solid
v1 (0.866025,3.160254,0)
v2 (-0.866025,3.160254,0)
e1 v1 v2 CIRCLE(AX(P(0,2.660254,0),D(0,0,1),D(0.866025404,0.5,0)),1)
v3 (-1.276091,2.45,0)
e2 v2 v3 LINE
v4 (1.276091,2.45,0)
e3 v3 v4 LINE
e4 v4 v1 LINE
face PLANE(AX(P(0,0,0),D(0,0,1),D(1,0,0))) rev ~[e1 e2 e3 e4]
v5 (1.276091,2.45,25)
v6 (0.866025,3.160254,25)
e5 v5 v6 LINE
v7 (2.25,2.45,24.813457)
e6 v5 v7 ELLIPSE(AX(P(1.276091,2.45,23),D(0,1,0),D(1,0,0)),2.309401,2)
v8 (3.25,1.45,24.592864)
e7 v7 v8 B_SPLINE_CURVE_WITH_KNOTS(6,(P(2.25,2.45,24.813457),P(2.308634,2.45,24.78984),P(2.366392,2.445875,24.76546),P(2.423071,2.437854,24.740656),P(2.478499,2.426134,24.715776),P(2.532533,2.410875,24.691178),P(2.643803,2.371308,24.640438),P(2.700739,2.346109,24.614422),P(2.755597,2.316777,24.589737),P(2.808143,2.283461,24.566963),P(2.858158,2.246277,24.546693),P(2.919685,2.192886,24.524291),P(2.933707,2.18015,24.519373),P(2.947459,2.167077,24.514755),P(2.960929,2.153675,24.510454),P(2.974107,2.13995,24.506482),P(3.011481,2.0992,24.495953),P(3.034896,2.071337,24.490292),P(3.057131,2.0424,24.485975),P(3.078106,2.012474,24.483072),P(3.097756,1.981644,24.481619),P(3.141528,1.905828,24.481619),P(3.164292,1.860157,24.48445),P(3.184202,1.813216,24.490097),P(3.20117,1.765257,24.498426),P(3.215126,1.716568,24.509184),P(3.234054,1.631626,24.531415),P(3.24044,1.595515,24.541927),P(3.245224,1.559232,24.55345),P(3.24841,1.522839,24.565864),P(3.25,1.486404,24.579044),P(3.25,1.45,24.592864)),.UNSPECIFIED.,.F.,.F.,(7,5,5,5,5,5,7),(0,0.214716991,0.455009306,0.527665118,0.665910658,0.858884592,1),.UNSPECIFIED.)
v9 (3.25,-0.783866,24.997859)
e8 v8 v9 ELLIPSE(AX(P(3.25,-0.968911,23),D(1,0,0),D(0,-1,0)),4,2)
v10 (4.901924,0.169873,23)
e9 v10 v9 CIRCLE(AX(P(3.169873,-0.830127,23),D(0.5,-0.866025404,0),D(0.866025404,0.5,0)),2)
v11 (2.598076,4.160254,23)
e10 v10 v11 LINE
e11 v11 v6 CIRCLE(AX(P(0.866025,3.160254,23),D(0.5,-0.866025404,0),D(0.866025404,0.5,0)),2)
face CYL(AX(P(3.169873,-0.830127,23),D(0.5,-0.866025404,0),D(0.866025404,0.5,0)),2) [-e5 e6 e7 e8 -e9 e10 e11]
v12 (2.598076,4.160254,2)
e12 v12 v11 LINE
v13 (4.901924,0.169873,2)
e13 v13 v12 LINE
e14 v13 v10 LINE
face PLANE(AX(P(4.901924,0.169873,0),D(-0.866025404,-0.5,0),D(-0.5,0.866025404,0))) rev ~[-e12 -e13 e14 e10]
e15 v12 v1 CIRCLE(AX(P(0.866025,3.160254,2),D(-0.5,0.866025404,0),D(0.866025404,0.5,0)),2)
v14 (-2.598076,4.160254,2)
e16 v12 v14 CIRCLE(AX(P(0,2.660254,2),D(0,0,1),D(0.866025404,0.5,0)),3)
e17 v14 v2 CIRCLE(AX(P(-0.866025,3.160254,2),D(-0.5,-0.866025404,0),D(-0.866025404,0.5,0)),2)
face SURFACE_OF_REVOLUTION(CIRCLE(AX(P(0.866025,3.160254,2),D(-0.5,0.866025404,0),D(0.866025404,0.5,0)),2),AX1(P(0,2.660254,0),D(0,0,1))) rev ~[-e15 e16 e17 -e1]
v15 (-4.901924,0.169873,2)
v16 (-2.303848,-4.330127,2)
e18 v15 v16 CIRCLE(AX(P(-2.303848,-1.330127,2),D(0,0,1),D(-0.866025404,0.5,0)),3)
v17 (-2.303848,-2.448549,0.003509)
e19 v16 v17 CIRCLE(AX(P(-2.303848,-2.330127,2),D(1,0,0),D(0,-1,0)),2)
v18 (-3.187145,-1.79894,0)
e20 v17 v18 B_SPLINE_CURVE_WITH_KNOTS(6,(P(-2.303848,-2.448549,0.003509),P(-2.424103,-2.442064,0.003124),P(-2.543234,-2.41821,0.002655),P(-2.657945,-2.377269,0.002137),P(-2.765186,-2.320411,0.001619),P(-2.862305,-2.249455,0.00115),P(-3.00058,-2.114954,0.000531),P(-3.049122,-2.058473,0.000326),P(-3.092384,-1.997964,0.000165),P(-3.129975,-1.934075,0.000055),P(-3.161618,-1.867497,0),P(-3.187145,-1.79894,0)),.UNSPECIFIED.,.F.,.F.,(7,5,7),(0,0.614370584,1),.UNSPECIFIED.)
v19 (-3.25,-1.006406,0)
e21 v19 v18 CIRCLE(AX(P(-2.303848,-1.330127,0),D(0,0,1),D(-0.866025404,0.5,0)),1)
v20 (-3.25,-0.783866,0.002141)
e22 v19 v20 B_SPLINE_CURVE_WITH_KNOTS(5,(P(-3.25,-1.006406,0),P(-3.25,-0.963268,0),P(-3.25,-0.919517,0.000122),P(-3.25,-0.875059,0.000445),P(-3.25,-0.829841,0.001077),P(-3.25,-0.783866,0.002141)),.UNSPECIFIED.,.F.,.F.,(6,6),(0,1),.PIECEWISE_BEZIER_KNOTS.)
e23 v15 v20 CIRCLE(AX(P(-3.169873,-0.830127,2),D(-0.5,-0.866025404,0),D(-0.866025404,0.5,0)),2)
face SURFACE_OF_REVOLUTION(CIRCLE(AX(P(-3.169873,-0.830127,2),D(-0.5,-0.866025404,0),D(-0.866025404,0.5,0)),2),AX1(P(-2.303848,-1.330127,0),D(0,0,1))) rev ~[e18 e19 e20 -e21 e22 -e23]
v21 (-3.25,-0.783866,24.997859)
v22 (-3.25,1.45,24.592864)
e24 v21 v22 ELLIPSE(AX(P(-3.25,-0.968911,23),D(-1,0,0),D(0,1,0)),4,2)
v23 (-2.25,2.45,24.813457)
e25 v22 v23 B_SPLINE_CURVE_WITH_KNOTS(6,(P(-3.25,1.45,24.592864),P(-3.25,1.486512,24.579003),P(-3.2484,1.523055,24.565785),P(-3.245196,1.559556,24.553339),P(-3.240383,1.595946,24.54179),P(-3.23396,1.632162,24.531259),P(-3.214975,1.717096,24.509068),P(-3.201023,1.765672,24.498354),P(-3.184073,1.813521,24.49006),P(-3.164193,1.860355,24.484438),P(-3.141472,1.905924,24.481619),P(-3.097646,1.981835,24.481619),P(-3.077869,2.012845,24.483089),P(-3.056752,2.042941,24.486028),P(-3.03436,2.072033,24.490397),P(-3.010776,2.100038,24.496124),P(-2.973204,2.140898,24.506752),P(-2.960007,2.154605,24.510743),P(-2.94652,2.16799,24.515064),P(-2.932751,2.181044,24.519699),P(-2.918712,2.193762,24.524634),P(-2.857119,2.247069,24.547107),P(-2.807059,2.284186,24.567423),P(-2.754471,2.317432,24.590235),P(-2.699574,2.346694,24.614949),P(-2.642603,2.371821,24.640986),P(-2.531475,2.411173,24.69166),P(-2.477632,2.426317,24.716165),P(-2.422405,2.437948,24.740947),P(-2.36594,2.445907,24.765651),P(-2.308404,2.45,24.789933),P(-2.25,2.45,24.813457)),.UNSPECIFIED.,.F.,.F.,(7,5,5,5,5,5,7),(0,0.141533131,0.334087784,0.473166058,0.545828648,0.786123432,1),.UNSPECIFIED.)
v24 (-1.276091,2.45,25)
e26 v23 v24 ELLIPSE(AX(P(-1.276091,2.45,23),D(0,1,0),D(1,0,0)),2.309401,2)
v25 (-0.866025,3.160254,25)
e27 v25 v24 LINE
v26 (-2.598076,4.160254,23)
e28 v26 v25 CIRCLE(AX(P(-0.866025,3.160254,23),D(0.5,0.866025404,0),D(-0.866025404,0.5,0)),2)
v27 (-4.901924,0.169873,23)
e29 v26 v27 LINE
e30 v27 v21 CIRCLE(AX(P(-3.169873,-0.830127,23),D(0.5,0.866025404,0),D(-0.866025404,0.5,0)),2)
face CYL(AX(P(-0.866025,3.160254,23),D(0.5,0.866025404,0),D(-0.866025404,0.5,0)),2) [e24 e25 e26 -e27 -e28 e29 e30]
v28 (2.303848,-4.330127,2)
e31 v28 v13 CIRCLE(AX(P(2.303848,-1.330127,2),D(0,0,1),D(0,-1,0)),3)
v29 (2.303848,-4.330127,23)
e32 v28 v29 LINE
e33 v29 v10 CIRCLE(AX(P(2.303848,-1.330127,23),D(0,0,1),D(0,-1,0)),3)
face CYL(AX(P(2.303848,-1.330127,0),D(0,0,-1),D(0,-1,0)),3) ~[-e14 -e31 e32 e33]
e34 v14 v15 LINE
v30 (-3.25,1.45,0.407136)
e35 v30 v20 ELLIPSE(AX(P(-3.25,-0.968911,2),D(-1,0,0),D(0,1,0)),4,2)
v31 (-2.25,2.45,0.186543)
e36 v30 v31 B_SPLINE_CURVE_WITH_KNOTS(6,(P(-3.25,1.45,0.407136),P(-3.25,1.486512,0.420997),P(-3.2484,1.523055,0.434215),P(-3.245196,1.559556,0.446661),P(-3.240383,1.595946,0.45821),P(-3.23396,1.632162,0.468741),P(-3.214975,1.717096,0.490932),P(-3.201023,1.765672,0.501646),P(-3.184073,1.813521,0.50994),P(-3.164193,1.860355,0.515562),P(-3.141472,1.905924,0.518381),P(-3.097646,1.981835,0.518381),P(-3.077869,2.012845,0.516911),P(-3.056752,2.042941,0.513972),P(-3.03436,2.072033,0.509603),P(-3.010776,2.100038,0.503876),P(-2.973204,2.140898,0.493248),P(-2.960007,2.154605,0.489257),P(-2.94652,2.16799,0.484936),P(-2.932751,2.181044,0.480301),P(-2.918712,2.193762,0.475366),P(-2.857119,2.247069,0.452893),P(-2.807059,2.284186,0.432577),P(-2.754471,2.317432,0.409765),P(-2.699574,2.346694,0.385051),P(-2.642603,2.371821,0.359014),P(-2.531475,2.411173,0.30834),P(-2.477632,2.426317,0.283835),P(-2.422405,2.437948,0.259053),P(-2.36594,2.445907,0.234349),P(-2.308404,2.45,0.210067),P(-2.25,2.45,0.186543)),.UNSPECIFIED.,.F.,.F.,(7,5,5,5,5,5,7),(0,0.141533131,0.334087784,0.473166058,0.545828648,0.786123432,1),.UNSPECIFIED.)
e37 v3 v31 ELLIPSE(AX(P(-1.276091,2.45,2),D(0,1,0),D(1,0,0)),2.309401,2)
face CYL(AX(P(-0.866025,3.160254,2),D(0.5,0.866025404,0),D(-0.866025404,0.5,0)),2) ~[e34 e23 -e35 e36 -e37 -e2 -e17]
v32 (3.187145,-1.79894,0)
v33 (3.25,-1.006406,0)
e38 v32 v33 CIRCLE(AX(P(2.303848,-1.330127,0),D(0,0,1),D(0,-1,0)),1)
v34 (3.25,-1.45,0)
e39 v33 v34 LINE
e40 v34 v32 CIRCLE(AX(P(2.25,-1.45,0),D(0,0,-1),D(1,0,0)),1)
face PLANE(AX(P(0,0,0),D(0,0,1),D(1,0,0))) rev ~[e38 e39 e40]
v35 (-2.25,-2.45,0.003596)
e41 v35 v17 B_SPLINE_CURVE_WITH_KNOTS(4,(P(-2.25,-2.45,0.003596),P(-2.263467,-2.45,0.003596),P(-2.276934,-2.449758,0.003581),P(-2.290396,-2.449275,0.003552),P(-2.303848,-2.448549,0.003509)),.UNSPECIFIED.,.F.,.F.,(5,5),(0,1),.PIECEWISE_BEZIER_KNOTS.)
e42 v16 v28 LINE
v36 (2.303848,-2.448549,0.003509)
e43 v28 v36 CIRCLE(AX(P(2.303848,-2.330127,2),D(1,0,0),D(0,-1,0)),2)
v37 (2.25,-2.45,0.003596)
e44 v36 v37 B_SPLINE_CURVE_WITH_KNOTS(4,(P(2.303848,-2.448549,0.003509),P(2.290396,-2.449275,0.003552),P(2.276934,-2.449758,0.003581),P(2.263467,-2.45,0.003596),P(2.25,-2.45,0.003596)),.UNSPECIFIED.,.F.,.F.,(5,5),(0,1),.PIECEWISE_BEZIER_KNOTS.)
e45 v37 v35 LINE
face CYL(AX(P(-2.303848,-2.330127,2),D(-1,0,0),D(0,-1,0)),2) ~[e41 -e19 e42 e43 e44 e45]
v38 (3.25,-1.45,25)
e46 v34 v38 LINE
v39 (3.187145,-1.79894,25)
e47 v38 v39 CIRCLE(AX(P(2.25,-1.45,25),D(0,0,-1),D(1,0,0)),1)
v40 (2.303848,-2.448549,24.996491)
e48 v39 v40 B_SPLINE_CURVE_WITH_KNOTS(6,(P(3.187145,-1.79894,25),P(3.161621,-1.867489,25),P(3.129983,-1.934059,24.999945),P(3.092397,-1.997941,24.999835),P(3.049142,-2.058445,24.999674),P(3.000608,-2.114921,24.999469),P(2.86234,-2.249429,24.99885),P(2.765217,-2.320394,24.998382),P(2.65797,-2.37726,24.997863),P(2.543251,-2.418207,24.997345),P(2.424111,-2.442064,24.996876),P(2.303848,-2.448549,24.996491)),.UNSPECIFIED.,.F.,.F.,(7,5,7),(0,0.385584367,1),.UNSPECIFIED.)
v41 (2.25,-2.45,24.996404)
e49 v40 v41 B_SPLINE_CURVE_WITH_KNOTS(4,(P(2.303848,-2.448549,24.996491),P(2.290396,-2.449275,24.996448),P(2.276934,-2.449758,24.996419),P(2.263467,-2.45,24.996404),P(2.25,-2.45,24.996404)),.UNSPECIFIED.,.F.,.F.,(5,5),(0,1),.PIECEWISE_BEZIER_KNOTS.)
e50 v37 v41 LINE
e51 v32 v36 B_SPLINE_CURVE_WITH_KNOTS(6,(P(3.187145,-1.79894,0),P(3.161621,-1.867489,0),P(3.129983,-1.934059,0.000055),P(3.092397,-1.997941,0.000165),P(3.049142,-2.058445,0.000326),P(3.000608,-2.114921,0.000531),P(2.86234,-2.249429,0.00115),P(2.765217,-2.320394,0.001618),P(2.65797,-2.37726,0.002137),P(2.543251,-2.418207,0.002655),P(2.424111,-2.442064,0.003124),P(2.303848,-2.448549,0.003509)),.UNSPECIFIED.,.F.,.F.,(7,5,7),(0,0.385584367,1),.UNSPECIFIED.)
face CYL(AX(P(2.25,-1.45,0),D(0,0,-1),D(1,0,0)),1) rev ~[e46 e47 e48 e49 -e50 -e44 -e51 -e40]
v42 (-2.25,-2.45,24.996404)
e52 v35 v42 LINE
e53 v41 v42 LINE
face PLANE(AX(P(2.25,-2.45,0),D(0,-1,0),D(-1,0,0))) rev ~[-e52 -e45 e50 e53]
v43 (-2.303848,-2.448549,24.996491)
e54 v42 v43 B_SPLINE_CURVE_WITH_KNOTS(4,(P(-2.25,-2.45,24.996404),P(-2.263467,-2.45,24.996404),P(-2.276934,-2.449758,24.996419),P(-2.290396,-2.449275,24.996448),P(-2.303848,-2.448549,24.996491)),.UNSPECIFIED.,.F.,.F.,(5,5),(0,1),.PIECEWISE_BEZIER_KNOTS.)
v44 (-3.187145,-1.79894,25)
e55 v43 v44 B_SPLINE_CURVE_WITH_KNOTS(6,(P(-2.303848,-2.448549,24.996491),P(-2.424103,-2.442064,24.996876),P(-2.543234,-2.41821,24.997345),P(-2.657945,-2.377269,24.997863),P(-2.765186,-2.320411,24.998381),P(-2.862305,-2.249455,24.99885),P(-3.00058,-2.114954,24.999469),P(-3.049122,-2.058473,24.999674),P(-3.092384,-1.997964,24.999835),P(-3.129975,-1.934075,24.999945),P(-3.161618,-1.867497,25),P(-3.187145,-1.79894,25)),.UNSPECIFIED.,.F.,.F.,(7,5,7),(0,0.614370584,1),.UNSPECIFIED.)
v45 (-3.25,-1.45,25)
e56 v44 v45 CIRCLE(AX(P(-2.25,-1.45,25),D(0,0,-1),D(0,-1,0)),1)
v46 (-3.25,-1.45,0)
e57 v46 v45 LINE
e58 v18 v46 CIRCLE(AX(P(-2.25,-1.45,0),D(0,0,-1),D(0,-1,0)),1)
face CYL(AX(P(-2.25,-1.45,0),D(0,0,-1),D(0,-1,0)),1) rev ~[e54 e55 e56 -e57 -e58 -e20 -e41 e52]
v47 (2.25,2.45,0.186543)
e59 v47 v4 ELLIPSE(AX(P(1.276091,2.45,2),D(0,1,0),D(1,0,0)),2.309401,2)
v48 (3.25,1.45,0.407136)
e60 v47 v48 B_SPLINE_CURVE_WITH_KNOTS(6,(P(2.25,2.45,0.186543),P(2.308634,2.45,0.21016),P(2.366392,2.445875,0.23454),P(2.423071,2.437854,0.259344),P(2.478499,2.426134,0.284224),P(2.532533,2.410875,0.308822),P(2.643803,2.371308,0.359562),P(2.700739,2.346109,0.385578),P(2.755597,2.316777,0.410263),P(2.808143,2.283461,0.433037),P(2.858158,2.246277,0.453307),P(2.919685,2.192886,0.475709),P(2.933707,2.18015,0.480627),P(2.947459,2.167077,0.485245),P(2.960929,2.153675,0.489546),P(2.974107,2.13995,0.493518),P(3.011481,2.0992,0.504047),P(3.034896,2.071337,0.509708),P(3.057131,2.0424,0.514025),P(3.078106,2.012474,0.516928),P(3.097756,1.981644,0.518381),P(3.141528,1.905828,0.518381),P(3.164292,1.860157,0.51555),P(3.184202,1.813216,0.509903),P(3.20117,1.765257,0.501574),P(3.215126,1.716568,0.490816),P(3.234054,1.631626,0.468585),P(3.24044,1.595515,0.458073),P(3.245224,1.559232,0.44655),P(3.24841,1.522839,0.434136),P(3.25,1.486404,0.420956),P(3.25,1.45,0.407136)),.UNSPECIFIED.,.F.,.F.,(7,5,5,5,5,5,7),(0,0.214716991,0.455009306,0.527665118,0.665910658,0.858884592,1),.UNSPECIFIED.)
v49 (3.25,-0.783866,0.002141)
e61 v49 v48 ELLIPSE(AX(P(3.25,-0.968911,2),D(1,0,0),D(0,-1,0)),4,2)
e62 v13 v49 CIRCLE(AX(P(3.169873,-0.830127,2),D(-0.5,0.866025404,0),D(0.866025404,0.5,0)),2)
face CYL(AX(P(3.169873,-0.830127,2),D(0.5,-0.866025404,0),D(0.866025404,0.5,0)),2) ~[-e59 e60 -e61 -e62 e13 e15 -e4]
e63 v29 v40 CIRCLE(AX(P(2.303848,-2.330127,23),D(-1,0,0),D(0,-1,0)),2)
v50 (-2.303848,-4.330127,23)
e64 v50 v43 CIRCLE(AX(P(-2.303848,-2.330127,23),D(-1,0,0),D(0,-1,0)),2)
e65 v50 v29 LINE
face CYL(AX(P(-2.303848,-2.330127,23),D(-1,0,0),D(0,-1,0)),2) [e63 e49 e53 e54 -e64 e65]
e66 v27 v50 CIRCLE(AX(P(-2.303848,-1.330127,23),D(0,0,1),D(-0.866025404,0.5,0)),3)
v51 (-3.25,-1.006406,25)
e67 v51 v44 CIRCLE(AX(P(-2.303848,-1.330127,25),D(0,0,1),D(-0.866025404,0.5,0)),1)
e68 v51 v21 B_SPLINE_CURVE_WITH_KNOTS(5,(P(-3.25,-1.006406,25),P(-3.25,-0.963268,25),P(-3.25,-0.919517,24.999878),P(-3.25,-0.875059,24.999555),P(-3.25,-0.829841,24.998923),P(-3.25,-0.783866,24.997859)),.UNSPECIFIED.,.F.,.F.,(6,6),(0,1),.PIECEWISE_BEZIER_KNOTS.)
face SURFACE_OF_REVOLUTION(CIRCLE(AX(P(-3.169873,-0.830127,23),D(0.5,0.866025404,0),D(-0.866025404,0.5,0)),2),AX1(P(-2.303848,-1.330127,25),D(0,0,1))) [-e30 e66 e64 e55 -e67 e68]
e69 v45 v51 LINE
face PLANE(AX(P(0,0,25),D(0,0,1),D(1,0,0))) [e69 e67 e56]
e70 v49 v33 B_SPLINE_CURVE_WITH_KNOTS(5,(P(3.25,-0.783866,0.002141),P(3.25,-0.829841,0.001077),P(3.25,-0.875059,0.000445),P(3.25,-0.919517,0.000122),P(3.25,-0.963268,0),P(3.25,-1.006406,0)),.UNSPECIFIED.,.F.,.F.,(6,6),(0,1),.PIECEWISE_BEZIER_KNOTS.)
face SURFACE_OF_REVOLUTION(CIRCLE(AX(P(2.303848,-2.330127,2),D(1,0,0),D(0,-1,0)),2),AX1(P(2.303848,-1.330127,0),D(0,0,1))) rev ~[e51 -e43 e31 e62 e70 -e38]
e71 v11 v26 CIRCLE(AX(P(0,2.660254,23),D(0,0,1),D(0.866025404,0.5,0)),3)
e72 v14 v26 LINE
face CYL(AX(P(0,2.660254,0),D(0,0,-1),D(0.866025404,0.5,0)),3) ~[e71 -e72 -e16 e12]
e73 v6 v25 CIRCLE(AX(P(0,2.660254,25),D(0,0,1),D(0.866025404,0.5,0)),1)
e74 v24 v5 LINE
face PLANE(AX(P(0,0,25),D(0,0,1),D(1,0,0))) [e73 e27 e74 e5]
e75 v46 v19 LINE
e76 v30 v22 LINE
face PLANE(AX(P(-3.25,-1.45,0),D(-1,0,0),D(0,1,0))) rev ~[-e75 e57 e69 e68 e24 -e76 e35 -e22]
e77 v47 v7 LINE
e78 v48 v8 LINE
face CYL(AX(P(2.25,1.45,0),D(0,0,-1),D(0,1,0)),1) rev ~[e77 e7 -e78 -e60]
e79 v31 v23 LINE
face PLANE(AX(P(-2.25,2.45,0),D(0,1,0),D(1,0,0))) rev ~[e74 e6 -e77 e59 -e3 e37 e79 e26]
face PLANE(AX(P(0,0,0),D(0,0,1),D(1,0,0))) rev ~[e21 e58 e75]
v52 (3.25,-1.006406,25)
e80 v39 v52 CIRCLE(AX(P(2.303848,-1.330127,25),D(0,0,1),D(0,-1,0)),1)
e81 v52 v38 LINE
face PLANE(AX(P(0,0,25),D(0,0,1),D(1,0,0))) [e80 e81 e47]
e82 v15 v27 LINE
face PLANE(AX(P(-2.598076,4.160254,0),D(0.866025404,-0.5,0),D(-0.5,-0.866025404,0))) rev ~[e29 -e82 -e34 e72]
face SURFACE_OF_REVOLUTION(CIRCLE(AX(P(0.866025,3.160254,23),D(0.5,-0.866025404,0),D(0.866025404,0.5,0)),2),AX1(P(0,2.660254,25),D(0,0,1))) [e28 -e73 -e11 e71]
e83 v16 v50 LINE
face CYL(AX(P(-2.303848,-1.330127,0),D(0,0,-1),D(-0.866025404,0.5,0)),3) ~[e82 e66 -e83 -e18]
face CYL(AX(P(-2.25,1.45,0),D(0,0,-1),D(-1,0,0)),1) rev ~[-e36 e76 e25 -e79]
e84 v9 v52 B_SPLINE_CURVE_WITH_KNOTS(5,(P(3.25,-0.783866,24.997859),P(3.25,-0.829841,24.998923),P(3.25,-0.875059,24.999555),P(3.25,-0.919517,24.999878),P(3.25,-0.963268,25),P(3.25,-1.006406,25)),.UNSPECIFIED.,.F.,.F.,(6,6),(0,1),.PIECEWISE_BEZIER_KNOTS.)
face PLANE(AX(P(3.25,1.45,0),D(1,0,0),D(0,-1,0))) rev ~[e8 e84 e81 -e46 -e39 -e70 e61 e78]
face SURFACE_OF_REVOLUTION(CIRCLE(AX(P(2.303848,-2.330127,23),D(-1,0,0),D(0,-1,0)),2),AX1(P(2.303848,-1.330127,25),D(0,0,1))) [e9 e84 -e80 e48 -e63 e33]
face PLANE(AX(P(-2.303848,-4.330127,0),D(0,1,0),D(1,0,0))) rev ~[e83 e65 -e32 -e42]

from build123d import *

# Parameters (mm, degrees)
F1_DEPTH     = 25
F2_T1_DEPTH  = 4.6076951546
F2_T3_DEPTH  = 4.6076951546
F2_T5_DEPTH  = 4.6076951546
F2_T8_ANGLE  = 120
F2_T10_ANGLE = 120
F2_T12_ANGLE = 120
F2_T14_ANGLE = 120
F2_T16_ANGLE = 120
F2_T18_ANGLE = 120


# Not quite as in the source:
# - a fillet or chamfer that OpenCascade refuses, or shapes differently, is made with other operations: its cross-section is extruded or revolved along the edge and cut away or added


with BuildPart() as f1:
    # F0 (on Top) → F1 (new body)
    with BuildSketch(Plane.XY):
        with BuildLine():
            Line((-2.3038475773, -4.3301270189), (2.3038475773, -4.3301270189))
            ThreePointArc((2.3038475773, -4.3301270189), (4.9019237886, -2.8301270189), (4.9019237886, 0.1698729811))
            Line((4.9019237886, 0.1698729811), (2.5980762114, 4.1602540378))
            ThreePointArc((2.5980762114, 4.1602540378), (0, 5.6602540378), (-2.5980762114, 4.1602540378))
            Line((-2.5980762114, 4.1602540378), (-4.9019237886, 0.1698729811))
            ThreePointArc((-4.9019237886, 0.1698729811), (-4.9019237886, -2.8301270189), (-2.3038475773, -4.3301270189))
        make_face()
        with BuildLine():
            ThreePointArc((3.25, -1.45), (2.9571067812, -2.1571067812), (2.25, -2.45))
            Line((2.25, -2.45), (-2.25, -2.45))
            ThreePointArc((-2.25, -2.45), (-2.9571067812, -2.1571067812), (-3.25, -1.45))
            Line((-3.25, -1.45), (-3.25, 1.45))
            ThreePointArc((-3.25, 1.45), (-2.9571067812, 2.1571067812), (-2.25, 2.45))
            Line((-2.25, 2.45), (2.25, 2.45))
            ThreePointArc((2.25, 2.45), (2.9571067812, 2.1571067812), (3.25, 1.45))
            Line((3.25, 1.45), (3.25, -1.45))
        make_face(mode=Mode.SUBTRACT)
    extrude(amount=F1_DEPTH)

    # F2: fillet of radius 2 on 12 edges, made by hand

    # F2_s2 → F2_t1 (cut)
    with BuildSketch(Plane(origin=(1.1519237886, -1.9951905284, 0), x_dir=(0, 0, 1), z_dir=(-0.5, 0.8660254038, 0))):
        with BuildLine():
            ThreePointArc((23, 4.3301270189), (24.4142135624, 3.7443405813), (25, 2.3301270189))
            Line((25, 2.3301270189), (25, 4.3301270189))
            Line((25, 4.3301270189), (23, 4.3301270189))
        make_face()
        with BuildLine():
            ThreePointArc((2, 4.3301270189), (0.5857864376, 3.7443405813), (0, 2.3301270189))
            Line((0, 2.3301270189), (0, 4.3301270189))
            Line((0, 4.3301270189), (2, 4.3301270189))
        make_face()
    extrude(amount=F2_T1_DEPTH, mode=Mode.SUBTRACT)

    # F2_s4 → F2_t3 (cut)
    with BuildSketch(Plane(origin=(1.1519237886, 1.9951905284, 0), x_dir=(0, 0, 1), z_dir=(-0.5, -0.8660254038, 0))):
        with BuildLine():
            ThreePointArc((23, 4.3301270189), (24.4142135624, 3.7443405813), (25, 2.3301270189))
            Line((25, 2.3301270189), (25, 4.3301270189))
            Line((25, 4.3301270189), (23, 4.3301270189))
        make_face()
        with BuildLine():
            ThreePointArc((2, 4.3301270189), (0.5857864376, 3.7443405813), (0, 2.3301270189))
            Line((0, 2.3301270189), (0, 4.3301270189))
            Line((0, 4.3301270189), (2, 4.3301270189))
        make_face()
    extrude(amount=F2_T3_DEPTH, mode=Mode.SUBTRACT)

    # F2_s6 → F2_t5 (cut)
    with BuildSketch(Plane.YZ.offset(-2.3038475773)):
        with BuildLine():
            ThreePointArc((-4.3301270189, 23), (-3.7443405813, 24.4142135624), (-2.3301270189, 25))
            Line((-2.3301270189, 25), (-4.3301270189, 25))
            Line((-4.3301270189, 25), (-4.3301270189, 23))
        make_face()
        with BuildLine():
            ThreePointArc((-4.3301270189, 2), (-3.7443405813, 0.5857864376), (-2.3301270189, 0))
            Line((-2.3301270189, 0), (-4.3301270189, 0))
            Line((-4.3301270189, 0), (-4.3301270189, 2))
        make_face()
    extrude(amount=F2_T5_DEPTH, mode=Mode.SUBTRACT)

    # F2_s7 → F2_t8 (revolve, cut)
    with BuildSketch(Plane(origin=(-1.1519237886, 1.9951905284, 0), x_dir=(0, 0, 1), z_dir=(0.5, -0.8660254038, 0))):
        with BuildLine():
            ThreePointArc((23, -4.3301270189), (24.4142135624, -3.7443405813), (25, -2.3301270189))
            Line((25, -2.3301270189), (25, -4.3301270189))
            Line((25, -4.3301270189), (23, -4.3301270189))
        make_face()
    revolve(axis=Axis((0, 2.6602540378, 25), (0, 0, 1)), revolution_arc=F2_T8_ANGLE, mode=Mode.SUBTRACT)

    # F2_s9 → F2_t10 (revolve, cut)
    with BuildSketch(Plane(origin=(-1.1519237886, -1.9951905284, 0), x_dir=(0, 0, 1), z_dir=(0.5, 0.8660254038, 0))):
        with BuildLine():
            ThreePointArc((23, -4.3301270189), (24.4142135624, -3.7443405813), (25, -2.3301270189))
            Line((25, -2.3301270189), (25, -4.3301270189))
            Line((25, -4.3301270189), (23, -4.3301270189))
        make_face()
    revolve(axis=Axis((-2.3038475773, -1.3301270189, 25), (0, 0, 1)), revolution_arc=F2_T10_ANGLE, mode=Mode.SUBTRACT)

    # F2_s11 → F2_t12 (revolve, cut)
    with BuildSketch(Plane.YZ.offset(2.3038475773)):
        with BuildLine():
            ThreePointArc((-4.3301270189, 23), (-3.7443405813, 24.4142135624), (-2.3301270189, 25))
            Line((-2.3301270189, 25), (-4.3301270189, 25))
            Line((-4.3301270189, 25), (-4.3301270189, 23))
        make_face()
    revolve(axis=Axis((2.3038475773, -1.3301270189, 25), (0, 0, 1)), revolution_arc=F2_T12_ANGLE, mode=Mode.SUBTRACT)

    # F2_s13 → F2_t14 (revolve, cut)
    with BuildSketch(Plane.YZ.offset(2.3038475773)):
        with BuildLine():
            ThreePointArc((-4.3301270189, 2), (-3.7443405813, 0.5857864376), (-2.3301270189, 0))
            Line((-2.3301270189, 0), (-4.3301270189, 0))
            Line((-4.3301270189, 0), (-4.3301270189, 2))
        make_face()
    revolve(axis=Axis((2.3038475773, -1.3301270189, 0), (0, 0, 1)), revolution_arc=F2_T14_ANGLE, mode=Mode.SUBTRACT)

    # F2_s15 → F2_t16 (revolve, cut)
    with BuildSketch(Plane(origin=(-1.1519237886, 1.9951905284, 0), x_dir=(0, 0, 1), z_dir=(0.5, -0.8660254038, 0))):
        with BuildLine():
            ThreePointArc((2, -4.3301270189), (0.5857864376, -3.7443405813), (0, -2.3301270189))
            Line((0, -2.3301270189), (0, -4.3301270189))
            Line((0, -4.3301270189), (2, -4.3301270189))
        make_face()
    revolve(axis=Axis((0, 2.6602540378, 0), (0, 0, 1)), revolution_arc=F2_T16_ANGLE, mode=Mode.SUBTRACT)

    # F2_s17 → F2_t18 (revolve, cut)
    with BuildSketch(Plane(origin=(-1.1519237886, -1.9951905284, 0), x_dir=(0, 0, 1), z_dir=(0.5, 0.8660254038, 0))):
        with BuildLine():
            ThreePointArc((2, -4.3301270189), (0.5857864376, -3.7443405813), (0, -2.3301270189))
            Line((0, -2.3301270189), (0, -4.3301270189))
            Line((0, -4.3301270189), (2, -4.3301270189))
        make_face()
    revolve(axis=Axis((-2.3038475773, -1.3301270189, 0), (0, 0, 1)), revolution_arc=F2_T18_ANGLE, mode=Mode.SUBTRACT)


solid = f1.part
